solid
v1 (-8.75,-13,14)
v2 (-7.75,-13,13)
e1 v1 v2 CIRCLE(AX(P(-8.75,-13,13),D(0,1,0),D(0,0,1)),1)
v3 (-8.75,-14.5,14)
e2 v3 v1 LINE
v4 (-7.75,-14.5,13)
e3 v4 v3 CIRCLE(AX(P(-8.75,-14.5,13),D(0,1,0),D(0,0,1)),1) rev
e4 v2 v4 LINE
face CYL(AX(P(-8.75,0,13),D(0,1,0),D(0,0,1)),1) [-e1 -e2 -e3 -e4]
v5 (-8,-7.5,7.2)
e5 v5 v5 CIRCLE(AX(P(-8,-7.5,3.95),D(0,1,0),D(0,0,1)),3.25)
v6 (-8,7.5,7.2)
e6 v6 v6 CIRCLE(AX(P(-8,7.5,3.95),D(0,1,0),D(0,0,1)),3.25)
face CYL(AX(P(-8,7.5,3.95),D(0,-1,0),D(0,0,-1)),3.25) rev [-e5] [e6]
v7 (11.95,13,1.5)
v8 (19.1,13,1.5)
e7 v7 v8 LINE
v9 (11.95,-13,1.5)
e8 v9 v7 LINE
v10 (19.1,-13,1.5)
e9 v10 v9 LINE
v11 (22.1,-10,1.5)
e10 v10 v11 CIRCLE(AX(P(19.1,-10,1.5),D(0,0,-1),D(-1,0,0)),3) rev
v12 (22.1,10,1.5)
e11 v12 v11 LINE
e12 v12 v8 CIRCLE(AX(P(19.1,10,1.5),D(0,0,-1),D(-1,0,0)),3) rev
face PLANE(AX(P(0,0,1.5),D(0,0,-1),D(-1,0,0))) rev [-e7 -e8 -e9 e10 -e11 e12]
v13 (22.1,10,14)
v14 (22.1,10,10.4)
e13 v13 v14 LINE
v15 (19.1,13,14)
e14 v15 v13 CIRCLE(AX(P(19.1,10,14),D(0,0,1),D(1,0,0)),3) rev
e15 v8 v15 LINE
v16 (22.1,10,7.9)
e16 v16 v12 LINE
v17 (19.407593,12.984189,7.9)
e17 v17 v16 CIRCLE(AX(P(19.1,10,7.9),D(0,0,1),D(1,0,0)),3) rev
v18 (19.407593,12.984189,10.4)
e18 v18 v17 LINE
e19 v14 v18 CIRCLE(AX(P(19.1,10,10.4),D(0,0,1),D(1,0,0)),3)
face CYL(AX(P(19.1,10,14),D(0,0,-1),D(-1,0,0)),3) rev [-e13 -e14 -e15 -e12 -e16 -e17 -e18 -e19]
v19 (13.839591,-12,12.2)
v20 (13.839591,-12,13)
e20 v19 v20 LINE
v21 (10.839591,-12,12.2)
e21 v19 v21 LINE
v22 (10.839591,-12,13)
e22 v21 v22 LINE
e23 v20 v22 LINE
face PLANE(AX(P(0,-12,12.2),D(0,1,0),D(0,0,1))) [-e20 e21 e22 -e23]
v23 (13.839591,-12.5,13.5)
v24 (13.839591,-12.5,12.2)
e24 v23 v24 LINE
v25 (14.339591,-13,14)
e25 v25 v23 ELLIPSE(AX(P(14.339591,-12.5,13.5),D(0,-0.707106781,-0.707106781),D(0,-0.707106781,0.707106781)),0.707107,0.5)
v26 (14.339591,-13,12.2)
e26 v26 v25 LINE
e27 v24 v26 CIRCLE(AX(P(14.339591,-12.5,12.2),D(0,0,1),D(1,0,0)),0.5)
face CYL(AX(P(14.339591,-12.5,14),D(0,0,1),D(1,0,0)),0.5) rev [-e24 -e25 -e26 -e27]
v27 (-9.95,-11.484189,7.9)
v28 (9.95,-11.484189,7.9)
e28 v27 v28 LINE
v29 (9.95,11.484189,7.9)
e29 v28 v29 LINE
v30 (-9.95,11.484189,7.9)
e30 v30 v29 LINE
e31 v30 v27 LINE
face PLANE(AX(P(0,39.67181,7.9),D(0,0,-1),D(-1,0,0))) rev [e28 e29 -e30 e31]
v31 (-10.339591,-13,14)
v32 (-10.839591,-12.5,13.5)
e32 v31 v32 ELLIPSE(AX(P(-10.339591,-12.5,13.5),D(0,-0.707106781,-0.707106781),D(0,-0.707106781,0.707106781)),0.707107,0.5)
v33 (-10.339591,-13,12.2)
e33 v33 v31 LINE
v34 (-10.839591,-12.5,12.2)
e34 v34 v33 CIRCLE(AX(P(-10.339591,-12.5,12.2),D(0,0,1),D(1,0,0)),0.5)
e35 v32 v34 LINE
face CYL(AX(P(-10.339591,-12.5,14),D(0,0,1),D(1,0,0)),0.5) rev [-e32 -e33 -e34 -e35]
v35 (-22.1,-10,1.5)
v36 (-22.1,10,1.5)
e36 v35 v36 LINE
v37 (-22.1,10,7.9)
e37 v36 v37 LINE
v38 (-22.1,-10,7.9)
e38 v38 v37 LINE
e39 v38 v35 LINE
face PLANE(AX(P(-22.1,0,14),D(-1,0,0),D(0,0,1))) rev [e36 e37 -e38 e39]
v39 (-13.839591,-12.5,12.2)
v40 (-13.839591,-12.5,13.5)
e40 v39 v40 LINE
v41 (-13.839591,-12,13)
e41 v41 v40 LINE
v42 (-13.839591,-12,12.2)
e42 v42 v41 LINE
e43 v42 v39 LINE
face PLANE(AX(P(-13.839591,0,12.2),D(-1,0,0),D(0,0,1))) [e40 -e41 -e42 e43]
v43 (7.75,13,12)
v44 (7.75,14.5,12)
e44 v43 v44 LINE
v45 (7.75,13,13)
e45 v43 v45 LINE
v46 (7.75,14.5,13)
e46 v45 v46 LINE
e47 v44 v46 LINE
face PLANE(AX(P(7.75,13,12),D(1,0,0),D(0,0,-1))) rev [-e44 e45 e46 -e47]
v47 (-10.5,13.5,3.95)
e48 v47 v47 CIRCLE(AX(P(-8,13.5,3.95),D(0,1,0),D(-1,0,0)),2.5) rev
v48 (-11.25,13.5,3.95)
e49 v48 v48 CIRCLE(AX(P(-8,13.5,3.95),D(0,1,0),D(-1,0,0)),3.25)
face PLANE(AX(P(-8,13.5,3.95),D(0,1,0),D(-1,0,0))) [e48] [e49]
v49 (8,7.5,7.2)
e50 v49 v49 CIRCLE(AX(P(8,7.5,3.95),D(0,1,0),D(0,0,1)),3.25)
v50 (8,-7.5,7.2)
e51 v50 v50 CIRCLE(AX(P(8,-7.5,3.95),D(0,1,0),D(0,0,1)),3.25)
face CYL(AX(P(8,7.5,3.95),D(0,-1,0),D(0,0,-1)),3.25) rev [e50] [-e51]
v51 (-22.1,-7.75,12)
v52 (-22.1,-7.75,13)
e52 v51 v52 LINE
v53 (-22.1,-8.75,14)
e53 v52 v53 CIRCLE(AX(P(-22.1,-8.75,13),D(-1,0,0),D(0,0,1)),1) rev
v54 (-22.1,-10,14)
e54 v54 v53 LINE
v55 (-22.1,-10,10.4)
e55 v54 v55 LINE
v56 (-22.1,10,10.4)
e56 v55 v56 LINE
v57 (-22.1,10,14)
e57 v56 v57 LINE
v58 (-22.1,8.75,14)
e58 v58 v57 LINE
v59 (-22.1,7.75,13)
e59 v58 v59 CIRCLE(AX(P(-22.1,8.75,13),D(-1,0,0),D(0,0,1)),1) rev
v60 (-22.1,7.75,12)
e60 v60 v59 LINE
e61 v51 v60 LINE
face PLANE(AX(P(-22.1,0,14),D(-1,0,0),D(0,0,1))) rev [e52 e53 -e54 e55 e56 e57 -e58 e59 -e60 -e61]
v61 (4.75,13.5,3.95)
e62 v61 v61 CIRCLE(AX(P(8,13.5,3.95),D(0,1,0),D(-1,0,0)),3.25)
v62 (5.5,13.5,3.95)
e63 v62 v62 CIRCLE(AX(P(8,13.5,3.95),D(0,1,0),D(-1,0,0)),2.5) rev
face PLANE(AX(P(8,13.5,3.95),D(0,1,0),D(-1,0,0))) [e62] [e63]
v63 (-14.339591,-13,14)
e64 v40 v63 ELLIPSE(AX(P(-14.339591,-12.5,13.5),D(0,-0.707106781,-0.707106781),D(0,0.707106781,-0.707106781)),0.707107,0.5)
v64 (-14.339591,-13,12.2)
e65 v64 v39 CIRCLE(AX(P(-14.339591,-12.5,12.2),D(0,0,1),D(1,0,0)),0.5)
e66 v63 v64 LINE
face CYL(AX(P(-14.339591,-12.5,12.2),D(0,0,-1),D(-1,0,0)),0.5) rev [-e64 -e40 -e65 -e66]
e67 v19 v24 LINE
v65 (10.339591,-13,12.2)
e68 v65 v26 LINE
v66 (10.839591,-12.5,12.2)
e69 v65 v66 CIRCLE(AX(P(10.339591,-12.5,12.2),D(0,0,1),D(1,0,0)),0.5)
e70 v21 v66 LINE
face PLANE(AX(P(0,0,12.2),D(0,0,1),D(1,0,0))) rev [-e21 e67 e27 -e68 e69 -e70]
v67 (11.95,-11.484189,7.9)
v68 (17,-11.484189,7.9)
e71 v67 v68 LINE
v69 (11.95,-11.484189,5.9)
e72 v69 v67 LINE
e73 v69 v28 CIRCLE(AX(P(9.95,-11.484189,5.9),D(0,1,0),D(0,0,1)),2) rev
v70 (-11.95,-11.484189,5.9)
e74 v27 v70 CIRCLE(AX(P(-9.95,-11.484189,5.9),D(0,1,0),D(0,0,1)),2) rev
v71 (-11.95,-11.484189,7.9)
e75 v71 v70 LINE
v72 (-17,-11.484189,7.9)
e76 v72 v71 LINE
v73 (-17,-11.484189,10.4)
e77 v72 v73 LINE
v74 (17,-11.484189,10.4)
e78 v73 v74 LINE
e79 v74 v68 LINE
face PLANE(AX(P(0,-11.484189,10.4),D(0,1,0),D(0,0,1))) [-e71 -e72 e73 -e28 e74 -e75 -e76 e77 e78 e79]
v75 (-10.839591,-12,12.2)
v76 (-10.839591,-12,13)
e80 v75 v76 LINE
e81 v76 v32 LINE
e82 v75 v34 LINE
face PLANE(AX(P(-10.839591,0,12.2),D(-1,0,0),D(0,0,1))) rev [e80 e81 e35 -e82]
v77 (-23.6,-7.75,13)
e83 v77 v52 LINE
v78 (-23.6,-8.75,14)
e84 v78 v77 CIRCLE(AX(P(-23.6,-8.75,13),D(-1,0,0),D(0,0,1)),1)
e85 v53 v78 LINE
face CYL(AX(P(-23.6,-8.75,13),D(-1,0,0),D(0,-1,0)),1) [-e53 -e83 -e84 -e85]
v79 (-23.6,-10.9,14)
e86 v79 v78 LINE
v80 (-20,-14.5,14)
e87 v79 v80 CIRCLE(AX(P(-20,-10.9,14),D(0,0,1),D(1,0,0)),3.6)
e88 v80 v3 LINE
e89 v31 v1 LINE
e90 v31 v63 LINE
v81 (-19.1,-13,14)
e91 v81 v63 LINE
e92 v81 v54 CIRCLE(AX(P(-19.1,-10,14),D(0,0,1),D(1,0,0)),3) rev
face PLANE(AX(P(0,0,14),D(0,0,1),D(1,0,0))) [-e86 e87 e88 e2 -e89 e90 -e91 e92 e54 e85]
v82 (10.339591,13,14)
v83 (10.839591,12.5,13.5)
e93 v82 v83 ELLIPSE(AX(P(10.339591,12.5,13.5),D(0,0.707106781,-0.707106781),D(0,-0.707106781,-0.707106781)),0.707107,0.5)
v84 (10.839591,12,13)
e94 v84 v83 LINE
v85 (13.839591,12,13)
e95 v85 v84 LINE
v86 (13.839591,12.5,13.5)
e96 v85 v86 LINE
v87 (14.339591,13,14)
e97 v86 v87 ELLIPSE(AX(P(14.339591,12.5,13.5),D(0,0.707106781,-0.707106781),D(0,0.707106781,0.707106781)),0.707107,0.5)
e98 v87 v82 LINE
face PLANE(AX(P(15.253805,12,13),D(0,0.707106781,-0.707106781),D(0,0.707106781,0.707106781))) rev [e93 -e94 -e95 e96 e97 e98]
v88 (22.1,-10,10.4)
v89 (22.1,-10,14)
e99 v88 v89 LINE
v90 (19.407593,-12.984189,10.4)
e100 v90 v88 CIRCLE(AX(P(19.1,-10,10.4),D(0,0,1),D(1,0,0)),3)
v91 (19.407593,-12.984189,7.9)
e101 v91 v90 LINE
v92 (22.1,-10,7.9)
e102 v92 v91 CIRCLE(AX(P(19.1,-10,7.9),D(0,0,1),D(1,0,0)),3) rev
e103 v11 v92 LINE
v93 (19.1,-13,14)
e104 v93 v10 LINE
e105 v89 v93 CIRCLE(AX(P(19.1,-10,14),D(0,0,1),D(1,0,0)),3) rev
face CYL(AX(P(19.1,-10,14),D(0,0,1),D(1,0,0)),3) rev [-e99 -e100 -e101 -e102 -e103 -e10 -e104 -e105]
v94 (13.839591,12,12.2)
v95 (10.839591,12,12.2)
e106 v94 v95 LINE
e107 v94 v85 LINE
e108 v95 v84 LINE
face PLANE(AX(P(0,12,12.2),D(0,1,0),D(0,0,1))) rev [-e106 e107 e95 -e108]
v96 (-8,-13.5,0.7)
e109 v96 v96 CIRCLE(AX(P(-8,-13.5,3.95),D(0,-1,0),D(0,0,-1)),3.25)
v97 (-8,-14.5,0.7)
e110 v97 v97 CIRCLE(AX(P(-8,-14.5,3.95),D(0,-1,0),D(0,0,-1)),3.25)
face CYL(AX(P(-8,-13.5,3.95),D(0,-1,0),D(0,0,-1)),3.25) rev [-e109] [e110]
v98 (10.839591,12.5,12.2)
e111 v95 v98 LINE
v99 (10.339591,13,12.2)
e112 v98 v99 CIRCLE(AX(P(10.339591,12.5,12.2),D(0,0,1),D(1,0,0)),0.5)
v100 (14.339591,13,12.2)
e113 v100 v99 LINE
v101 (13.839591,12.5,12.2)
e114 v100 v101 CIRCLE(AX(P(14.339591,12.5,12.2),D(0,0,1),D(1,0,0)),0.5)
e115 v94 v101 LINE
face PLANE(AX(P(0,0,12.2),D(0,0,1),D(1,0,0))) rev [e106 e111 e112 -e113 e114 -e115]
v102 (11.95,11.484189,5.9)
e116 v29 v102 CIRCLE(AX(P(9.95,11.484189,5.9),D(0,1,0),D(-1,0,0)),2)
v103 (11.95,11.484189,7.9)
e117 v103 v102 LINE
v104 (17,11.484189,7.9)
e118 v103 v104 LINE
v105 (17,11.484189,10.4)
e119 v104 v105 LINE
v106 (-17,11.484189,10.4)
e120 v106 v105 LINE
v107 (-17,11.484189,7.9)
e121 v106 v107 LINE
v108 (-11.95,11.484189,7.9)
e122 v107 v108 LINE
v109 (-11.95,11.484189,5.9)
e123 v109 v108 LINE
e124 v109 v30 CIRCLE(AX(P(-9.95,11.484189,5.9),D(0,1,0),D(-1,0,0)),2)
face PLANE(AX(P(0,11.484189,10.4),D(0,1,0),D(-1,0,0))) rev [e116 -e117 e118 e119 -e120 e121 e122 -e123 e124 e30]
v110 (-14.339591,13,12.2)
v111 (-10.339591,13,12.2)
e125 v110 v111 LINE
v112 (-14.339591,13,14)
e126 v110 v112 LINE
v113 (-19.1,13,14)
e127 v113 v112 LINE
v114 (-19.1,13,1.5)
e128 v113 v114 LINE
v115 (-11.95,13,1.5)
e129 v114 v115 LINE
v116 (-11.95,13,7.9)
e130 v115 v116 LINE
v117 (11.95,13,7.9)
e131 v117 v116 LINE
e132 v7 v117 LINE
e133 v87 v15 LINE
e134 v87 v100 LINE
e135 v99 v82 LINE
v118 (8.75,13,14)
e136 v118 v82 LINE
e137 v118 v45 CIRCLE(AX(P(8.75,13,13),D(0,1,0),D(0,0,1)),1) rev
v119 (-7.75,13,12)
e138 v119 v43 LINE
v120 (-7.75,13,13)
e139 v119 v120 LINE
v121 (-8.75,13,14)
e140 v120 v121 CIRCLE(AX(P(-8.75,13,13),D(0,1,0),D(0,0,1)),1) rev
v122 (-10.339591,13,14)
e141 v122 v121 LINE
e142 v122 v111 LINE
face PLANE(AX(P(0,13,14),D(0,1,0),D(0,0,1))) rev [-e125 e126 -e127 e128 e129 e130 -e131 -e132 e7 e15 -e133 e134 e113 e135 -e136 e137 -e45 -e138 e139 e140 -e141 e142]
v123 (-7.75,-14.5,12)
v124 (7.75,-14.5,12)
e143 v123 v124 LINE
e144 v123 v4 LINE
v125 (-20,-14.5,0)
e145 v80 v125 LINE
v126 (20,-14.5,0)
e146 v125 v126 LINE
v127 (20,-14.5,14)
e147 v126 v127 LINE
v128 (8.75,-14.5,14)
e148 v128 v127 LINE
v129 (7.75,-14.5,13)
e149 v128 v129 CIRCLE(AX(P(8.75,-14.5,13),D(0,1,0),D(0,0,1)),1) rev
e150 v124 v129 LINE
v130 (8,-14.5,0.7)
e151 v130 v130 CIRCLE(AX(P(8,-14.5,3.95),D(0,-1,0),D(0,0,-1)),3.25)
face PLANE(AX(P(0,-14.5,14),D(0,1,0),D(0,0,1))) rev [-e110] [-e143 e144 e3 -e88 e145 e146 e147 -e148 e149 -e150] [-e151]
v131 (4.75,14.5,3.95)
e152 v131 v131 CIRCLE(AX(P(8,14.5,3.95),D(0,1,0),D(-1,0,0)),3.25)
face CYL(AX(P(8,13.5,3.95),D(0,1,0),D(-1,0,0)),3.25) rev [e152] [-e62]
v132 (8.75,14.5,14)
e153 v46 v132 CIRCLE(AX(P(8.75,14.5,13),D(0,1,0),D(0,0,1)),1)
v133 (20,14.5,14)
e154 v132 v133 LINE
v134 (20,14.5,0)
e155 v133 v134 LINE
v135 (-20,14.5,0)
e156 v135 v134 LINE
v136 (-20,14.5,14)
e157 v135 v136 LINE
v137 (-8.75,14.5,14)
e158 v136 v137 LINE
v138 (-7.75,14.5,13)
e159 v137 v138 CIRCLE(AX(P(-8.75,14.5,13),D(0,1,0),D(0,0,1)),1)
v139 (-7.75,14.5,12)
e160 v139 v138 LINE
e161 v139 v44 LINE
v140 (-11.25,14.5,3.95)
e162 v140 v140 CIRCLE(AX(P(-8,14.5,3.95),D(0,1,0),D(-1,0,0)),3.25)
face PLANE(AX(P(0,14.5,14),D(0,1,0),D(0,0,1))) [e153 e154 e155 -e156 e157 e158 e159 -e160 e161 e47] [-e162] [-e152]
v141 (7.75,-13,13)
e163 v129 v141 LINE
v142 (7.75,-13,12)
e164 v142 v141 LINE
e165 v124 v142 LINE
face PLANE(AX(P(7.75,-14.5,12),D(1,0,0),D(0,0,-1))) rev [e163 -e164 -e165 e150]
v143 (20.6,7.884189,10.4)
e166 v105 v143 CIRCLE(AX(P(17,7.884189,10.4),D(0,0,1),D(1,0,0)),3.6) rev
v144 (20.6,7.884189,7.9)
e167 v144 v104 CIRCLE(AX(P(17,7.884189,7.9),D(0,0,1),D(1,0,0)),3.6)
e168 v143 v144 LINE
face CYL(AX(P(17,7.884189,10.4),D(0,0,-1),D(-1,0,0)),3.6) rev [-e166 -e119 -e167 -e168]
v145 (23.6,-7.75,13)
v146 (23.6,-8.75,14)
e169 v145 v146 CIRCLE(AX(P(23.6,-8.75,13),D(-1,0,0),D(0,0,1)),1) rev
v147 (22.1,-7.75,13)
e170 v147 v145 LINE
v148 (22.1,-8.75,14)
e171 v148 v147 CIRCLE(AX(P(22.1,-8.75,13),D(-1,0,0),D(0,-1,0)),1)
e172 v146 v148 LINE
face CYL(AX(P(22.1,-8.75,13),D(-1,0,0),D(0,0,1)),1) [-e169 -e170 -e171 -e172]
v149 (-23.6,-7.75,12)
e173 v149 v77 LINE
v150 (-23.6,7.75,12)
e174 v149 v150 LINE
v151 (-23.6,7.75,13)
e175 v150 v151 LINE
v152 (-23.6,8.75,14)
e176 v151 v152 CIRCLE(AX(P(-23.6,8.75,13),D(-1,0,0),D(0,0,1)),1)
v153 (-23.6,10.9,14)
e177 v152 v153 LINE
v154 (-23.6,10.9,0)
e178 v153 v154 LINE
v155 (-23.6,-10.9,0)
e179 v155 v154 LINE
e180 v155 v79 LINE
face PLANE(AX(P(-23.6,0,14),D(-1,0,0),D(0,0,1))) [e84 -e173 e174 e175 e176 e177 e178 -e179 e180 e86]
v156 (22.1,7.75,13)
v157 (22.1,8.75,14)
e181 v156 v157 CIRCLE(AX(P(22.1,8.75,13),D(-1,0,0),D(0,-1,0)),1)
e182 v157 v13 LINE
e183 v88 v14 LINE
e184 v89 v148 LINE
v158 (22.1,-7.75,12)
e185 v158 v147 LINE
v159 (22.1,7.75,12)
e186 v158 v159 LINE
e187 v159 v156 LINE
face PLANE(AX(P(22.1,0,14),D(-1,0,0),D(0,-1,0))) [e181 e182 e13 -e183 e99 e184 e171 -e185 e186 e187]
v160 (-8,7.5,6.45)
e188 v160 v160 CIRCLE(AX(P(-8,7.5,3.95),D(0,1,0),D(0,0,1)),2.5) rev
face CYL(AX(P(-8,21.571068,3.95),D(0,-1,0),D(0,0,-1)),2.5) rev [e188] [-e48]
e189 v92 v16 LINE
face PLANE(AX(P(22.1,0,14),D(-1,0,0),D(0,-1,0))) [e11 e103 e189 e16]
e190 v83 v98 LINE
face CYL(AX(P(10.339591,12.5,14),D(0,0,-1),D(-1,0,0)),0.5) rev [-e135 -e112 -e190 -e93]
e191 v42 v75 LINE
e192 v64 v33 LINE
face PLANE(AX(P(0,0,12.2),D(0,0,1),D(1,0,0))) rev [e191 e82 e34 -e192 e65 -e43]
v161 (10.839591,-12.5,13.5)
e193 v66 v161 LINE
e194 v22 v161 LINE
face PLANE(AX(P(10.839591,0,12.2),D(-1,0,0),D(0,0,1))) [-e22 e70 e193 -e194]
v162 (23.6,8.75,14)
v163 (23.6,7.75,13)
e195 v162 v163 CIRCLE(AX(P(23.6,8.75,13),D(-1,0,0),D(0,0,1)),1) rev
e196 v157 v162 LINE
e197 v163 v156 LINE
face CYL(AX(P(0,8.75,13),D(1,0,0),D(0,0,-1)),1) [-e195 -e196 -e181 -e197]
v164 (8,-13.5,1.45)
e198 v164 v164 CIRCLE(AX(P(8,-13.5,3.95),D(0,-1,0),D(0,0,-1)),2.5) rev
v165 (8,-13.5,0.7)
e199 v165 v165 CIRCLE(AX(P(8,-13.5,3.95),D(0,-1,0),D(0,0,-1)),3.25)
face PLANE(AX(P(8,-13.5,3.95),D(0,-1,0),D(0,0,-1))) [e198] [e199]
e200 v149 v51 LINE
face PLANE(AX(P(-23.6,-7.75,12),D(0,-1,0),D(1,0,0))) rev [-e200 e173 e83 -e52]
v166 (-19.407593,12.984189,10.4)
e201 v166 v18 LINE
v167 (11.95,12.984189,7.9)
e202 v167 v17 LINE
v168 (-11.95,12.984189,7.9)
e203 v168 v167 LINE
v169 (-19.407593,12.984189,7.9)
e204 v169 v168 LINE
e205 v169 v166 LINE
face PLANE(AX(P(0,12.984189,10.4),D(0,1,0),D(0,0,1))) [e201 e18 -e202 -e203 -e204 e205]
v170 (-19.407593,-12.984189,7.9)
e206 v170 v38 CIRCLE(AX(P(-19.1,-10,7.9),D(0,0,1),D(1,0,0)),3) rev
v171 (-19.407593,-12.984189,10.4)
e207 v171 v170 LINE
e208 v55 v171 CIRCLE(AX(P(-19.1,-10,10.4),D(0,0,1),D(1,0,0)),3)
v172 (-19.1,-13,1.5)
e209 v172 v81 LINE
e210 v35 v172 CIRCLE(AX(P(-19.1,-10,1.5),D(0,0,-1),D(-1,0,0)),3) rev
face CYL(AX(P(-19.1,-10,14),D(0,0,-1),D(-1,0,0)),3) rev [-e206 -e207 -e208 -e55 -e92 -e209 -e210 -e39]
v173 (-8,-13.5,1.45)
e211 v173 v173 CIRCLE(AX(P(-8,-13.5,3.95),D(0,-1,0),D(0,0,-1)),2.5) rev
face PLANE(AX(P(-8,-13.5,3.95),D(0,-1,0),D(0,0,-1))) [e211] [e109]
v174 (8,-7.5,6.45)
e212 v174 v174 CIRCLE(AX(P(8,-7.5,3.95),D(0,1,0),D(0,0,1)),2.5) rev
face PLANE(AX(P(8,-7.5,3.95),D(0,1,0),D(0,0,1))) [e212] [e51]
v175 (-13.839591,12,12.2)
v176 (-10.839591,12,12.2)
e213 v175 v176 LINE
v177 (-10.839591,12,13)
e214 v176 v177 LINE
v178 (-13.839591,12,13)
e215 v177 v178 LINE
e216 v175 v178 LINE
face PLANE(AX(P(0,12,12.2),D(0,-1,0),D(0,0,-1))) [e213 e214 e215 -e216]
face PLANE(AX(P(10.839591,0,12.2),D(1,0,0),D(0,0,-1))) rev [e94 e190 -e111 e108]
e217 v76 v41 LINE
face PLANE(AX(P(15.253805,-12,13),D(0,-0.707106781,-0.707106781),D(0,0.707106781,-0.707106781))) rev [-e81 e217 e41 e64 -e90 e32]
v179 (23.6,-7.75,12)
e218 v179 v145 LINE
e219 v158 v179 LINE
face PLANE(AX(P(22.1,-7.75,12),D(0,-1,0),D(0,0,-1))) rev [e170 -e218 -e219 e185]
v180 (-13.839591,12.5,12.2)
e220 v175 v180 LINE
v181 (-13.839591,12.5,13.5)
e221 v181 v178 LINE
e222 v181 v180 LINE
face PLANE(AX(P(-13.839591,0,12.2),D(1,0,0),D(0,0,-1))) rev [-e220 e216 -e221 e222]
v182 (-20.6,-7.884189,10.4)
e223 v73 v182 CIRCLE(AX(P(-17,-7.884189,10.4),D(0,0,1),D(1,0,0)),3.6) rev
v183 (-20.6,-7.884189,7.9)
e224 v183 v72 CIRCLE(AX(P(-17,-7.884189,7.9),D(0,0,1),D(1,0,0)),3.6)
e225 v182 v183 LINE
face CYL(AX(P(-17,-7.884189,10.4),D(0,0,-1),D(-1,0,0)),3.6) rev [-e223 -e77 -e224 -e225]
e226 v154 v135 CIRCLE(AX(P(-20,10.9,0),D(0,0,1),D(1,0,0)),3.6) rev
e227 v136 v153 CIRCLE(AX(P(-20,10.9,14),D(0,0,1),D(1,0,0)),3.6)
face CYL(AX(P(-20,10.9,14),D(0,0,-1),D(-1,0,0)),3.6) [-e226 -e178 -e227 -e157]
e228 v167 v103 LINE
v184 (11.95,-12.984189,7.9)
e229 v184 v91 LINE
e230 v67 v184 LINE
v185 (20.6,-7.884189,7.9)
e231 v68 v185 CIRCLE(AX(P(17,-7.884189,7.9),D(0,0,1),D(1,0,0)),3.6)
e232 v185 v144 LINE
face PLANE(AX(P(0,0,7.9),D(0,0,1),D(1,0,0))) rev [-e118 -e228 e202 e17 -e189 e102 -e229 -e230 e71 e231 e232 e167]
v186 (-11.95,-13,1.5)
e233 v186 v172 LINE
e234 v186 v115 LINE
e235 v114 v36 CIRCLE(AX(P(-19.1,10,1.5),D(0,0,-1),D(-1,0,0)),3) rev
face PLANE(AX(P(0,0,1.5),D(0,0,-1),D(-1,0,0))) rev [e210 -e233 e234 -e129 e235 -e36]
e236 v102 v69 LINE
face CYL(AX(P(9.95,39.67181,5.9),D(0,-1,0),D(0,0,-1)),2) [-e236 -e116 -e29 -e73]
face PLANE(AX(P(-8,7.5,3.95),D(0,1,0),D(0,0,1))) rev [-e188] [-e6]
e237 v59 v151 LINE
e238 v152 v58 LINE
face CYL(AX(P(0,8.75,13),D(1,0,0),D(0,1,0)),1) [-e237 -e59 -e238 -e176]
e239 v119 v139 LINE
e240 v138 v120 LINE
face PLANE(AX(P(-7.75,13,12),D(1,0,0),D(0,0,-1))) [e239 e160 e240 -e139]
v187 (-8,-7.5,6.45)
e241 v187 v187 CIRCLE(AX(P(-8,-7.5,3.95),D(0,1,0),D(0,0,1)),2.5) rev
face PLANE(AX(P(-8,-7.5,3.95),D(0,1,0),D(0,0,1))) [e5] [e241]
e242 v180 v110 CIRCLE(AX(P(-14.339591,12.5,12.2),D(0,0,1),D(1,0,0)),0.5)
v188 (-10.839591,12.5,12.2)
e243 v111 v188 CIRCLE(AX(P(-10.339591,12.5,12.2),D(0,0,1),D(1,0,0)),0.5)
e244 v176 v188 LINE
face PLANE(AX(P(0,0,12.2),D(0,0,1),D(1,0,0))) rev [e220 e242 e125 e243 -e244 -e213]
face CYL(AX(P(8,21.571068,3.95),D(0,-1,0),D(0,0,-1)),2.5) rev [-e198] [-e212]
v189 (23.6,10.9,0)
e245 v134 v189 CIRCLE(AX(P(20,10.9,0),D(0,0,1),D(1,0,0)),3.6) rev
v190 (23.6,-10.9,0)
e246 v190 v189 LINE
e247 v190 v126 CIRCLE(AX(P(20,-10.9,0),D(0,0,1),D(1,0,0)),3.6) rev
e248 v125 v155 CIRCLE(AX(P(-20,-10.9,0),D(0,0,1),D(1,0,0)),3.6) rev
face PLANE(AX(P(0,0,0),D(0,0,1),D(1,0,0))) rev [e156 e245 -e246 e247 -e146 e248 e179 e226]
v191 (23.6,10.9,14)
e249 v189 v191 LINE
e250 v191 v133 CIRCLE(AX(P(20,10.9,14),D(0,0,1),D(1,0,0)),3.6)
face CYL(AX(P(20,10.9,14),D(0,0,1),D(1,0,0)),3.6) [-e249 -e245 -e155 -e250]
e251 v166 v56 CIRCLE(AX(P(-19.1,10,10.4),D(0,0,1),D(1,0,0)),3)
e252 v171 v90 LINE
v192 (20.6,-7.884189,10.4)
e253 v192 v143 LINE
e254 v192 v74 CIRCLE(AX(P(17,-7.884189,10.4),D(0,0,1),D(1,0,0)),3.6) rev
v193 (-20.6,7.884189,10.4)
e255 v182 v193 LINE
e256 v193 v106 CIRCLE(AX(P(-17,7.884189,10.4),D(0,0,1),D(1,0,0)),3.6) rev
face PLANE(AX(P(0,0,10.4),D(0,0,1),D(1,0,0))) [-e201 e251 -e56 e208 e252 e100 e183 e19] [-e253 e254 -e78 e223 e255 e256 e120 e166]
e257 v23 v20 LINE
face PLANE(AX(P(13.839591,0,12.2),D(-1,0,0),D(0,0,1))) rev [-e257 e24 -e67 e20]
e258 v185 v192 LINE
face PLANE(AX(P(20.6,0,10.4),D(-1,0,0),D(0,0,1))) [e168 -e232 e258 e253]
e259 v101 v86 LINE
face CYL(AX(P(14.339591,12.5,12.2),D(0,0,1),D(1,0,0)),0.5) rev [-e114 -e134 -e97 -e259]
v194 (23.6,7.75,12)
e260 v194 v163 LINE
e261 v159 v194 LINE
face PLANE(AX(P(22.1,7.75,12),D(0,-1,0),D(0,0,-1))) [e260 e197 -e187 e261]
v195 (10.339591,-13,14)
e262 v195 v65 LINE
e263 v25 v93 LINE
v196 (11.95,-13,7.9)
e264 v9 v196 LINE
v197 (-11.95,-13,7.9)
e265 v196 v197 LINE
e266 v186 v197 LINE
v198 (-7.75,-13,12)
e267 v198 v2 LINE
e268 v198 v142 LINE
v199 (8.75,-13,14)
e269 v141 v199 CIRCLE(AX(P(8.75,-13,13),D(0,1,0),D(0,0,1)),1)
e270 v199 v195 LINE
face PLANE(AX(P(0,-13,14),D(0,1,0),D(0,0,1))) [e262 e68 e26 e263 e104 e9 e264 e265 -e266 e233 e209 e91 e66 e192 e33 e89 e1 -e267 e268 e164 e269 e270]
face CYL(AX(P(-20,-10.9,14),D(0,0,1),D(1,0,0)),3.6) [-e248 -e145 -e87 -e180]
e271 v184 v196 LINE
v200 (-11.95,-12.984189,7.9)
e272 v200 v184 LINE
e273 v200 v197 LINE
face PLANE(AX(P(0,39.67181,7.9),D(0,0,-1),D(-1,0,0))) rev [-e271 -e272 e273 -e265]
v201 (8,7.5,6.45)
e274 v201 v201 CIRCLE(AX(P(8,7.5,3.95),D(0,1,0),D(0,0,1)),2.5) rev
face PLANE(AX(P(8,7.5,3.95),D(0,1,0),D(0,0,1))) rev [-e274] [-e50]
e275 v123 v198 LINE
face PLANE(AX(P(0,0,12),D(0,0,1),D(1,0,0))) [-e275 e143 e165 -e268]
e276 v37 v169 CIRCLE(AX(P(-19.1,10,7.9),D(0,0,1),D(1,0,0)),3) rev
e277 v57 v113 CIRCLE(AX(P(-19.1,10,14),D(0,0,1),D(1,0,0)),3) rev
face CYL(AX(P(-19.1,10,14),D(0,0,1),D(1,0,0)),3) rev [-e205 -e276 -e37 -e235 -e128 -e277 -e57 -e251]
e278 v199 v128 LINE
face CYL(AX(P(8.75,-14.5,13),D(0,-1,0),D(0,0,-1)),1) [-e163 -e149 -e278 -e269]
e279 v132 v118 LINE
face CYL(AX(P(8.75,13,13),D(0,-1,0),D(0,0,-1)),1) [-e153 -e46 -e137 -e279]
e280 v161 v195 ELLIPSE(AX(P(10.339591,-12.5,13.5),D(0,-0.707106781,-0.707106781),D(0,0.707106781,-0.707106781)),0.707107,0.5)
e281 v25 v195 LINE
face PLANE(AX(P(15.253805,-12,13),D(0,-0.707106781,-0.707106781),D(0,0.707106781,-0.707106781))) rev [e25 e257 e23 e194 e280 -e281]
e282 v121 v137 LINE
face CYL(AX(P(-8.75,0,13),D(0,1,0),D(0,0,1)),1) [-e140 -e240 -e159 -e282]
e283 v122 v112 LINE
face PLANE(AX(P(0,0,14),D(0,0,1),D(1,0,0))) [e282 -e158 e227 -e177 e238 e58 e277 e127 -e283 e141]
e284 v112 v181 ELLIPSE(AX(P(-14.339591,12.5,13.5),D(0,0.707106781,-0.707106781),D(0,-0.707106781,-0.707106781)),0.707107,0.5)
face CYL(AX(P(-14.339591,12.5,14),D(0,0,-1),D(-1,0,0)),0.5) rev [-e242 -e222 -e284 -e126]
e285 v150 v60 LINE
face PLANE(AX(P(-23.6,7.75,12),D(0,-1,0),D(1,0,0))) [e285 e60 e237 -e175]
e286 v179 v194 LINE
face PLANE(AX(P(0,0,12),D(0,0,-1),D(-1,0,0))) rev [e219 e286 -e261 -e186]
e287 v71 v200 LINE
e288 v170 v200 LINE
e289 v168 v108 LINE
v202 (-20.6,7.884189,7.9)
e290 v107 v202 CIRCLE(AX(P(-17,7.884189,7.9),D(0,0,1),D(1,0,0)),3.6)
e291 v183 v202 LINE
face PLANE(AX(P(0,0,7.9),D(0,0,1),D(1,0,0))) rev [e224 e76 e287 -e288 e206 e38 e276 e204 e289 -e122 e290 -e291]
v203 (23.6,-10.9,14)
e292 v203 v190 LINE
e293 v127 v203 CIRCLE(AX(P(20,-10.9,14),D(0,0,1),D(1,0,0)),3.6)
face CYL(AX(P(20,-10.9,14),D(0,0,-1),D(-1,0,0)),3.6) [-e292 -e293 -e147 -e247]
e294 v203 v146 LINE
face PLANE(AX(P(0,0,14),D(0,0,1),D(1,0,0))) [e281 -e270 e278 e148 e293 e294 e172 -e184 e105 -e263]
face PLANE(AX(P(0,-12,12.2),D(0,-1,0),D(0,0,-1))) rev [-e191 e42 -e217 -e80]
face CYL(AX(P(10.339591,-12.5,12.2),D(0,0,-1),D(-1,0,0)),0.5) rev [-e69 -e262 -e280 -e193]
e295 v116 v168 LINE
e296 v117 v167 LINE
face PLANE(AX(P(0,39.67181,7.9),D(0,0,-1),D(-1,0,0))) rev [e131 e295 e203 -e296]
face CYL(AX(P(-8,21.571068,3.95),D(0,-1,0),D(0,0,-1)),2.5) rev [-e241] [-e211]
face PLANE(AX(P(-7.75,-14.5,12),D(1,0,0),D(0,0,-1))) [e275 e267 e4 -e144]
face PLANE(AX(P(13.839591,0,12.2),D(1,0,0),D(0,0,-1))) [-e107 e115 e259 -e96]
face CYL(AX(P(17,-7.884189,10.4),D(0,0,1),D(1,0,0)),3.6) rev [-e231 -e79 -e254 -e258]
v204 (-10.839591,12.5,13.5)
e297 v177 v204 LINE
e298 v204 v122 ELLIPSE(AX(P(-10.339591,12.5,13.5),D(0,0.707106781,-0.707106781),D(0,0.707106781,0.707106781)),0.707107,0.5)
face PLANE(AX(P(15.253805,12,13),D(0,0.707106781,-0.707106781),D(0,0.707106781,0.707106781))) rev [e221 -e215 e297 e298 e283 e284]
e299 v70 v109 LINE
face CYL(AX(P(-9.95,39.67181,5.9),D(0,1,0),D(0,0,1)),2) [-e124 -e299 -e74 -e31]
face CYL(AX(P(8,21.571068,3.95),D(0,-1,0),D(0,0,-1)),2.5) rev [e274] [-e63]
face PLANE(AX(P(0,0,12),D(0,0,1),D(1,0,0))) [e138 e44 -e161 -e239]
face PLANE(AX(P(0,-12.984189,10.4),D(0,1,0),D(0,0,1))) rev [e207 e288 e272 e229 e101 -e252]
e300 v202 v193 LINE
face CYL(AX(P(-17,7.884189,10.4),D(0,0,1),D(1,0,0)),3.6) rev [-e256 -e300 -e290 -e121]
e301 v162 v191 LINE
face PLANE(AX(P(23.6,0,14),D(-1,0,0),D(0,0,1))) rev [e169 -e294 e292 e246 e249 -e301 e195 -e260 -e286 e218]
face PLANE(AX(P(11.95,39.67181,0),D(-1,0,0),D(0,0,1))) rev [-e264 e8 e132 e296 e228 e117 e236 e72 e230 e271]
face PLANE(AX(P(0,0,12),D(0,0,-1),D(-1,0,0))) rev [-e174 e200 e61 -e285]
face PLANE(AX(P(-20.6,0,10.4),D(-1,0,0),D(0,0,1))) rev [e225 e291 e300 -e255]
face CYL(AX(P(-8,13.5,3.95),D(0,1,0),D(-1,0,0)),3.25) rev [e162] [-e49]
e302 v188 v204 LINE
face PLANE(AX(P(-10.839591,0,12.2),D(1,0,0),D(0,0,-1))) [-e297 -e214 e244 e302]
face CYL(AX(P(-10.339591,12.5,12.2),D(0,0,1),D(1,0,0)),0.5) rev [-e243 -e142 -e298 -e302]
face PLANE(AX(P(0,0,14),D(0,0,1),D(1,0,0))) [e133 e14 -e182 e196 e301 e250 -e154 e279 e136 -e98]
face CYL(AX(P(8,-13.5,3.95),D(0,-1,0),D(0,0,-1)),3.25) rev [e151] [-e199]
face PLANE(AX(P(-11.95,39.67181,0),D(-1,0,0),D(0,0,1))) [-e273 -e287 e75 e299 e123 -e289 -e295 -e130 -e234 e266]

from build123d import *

# Parameters (mm, degrees)
SKETCH1_W               = 47.2
SKETCH1_H               = 29
SKETCH1_W_2             = 44.2
SKETCH1_H_2             = 26
BOSS_EXTRUDE2_DEPTH     = 14
SKETCH2_W               = 44.2
SKETCH2_H               = 26
BOSS_EXTRUDE3_DEPTH     = 1.5
SKETCH3_W               = 23.9
SKETCH3_H               = 7.9
SKETCH3_R               = 2.45
BOSS_EXTRUDE4_DEPTH     = 29
SKETCH4_R               = 2.5
CUT_EXTRUDE1_DEPTH      = 29
SKETCH5_R               = 3.25
CUT_EXTRUDE2_DEPTH      = 1
CUT_EXTRUDE3_START      = -1
SKETCH6_R               = 3.25
CUT_EXTRUDE3_DEPTH      = 1
CUT_EXTRUDE4_DEPTH      = 7.5
CUT_EXTRUDE4_DEPTH_BACK = 7.5
SKETCH8_R               = 3.25
SKETCH9_W               = 44.2
SKETCH9_H               = 25.968378764
SKETCH9_W_2             = 41.2
SKETCH9_H_2             = 22.968378764
BOSS_EXTRUDE5_DEPTH     = 2.5
SKETCH10_W              = 15.5
SKETCH10_H              = 1.5
SKETCH10_W_2            = 1.5
SKETCH10_H_2            = 15.5
CUT_EXTRUDE6_DEPTH      = 2
FILLET1_R               = 2
BOSS_EXTRUDE6_DEPTH     = 1.8
CUT_EXTRUDE7_REACH      = 44.52
FILLET2_R               = 0.5
FILLET3_R               = 3.6
FILLET4_R               = 1
FILLET5_R               = 3


with BuildPart() as part:
    # Sketch1 → Boss-Extrude2 (new body)
    with BuildSketch(Plane.XY):
        Rectangle(SKETCH1_W, SKETCH1_H)
        Rectangle(SKETCH1_W_2, SKETCH1_H_2, mode=Mode.SUBTRACT)
    extrude(amount=BOSS_EXTRUDE2_DEPTH)

    # Sketch2 → Boss-Extrude3 (add)
    with BuildSketch(Plane(origin=(0, 0, 0), x_dir=(-1, 0, 0), z_dir=(0, 0, -1))):
        Rectangle(SKETCH2_W, SKETCH2_H)
    extrude(amount=-BOSS_EXTRUDE3_DEPTH)

    # Sketch3 → Boss-Extrude4 (add)
    with BuildSketch(Plane.XZ.offset(14.5)):
        with Locations((0, 3.95)):
            Rectangle(SKETCH3_W, SKETCH3_H)
        with Locations(Location((-8, 3.95, 0), (0, 0, 90))):
            Circle(SKETCH3_R, mode=Mode.SUBTRACT)
        with Locations(Location((8, 3.95, 0), (0, 0, 90))):
            Circle(SKETCH3_R, mode=Mode.SUBTRACT)
    extrude(amount=-BOSS_EXTRUDE4_DEPTH)

    # Sketch4 → Cut-Extrude1 (cut)
    with BuildSketch(Plane.XZ.offset(14.5)):
        with Locations(Location((-8, 3.95, 0), (0, 0, 270))):
            Circle(SKETCH4_R)
        with Locations(Location((8, 3.95, 0), (0, 0, 270))):
            Circle(SKETCH4_R)
    extrude(amount=-CUT_EXTRUDE1_DEPTH, mode=Mode.SUBTRACT)

    # Sketch5 → Cut-Extrude2 (cut)
    with BuildSketch(Plane.XZ.offset(14.5)):
        with Locations(Location((-8, 3.95, 0), (0, 0, 270))):
            Circle(SKETCH5_R)
        with Locations(Location((8, 3.95, 0), (0, 0, 270))):
            Circle(SKETCH5_R)
    extrude(amount=-CUT_EXTRUDE2_DEPTH, mode=Mode.SUBTRACT)

    # Sketch6 → Cut-Extrude3 (cut)
    with BuildSketch(Plane(origin=(0, 14.5, 0), x_dir=(1, 0, 0), z_dir=(0, 1, 0)).offset(CUT_EXTRUDE3_START)):
        with Locations(Location((-8, -3.95, 0), (0, 0, 90))):
            Circle(SKETCH6_R)
        with Locations(Location((8, -3.95, 0), (0, 0, 90))):
            Circle(SKETCH6_R)
    extrude(amount=CUT_EXTRUDE3_DEPTH, mode=Mode.SUBTRACT)

    # Sketch8 → Cut-Extrude4 (cut, two sides: drawn at the far end of the back side and taken through both)
    with BuildSketch(Plane(origin=(0, 0, 0), x_dir=(1, 0, 0), z_dir=(0, 1, 0)).offset(-CUT_EXTRUDE4_DEPTH_BACK)):
        with Locations(Location((-8, -3.95, 0), (0, 0, 90))):
            Circle(SKETCH8_R)
        with Locations(Location((8, -3.95, 0), (0, 0, 90))):
            Circle(SKETCH8_R)
    extrude(amount=CUT_EXTRUDE4_DEPTH + CUT_EXTRUDE4_DEPTH_BACK, mode=Mode.SUBTRACT)

    # Sketch9 → Boss-Extrude5 (add)
    with BuildSketch(Plane.XY.offset(7.9)):
        Rectangle(SKETCH9_W, SKETCH9_H)
        Rectangle(SKETCH9_W_2, SKETCH9_H_2, mode=Mode.SUBTRACT)
    extrude(amount=BOSS_EXTRUDE5_DEPTH)

    # Sketch10 → Cut-Extrude6 (cut)
    with BuildSketch(Plane.XY.offset(14)):
        with Locations((0, 13.75)):
            Rectangle(SKETCH10_W, SKETCH10_H)
        with Locations((22.85, 0)):
            Rectangle(SKETCH10_W_2, SKETCH10_H_2)
        with Locations((0, -13.75)):
            Rectangle(SKETCH10_W, SKETCH10_H)
        with Locations((-22.85, 0)):
            Rectangle(SKETCH10_W_2, SKETCH10_H_2)
    extrude(amount=-CUT_EXTRUDE6_DEPTH, mode=Mode.SUBTRACT)

    # Fillet1
    fillet1_edges = [part.edges().sort_by_distance(p)[0] for p in [
        (11.95, 0, 7.9),
        (-11.95, 0, 7.9),
    ]]
    fillet(fillet1_edges, radius=FILLET1_R)

    # Sketch12 → Boss-Extrude6 (add)
    with BuildSketch(Plane.XY.offset(14)):
        Polygon((-10.839591229, 12), (-10.839591229, 13), (-12.339591229, 13), (-13.839591229, 13), (-13.839591229, 12), align=None)
        Polygon((-10.839591229, -13), (-10.839591229, -12), (-13.839591229, -12), (-13.839591229, -13), (-12.339591229, -13), align=None)
        Polygon((10.839591229, -12), (10.839591229, -13), (12.339591229, -13), (13.839591229, -13), (13.839591229, -12), align=None)
        Polygon((10.839591229, 13), (10.839591229, 12), (13.839591229, 12), (13.839591229, 13), (12.339591229, 13), align=None)
    extrude(amount=-BOSS_EXTRUDE6_DEPTH)

    # Cut-Extrude7: up to this face of the body (flat: up to its plane)
    cut_extrude7_end = Plane(part.part.faces().sort_by_distance((13.839591229, -12.5, 13.1))[0])
    # Sketch13 → Cut-Extrude7 (cut, up to the picked face)
    with BuildSketch(Plane.ZY.offset(13.839591229), mode=Mode.PRIVATE) as cut_extrude7_sk1:
        Polygon((14, 13), (14, 12), (13, 12), align=None)
    cut_extrude7_tool1 = split(extrude(cut_extrude7_sk1.sketch, amount=-CUT_EXTRUDE7_REACH, mode=Mode.PRIVATE), bisect_by=cut_extrude7_end, keep=Keep.BOTH, mode=Mode.PRIVATE)
    # Sketch13 → Cut-Extrude7 (cut, up to the picked face)
    with BuildSketch(Plane.ZY.offset(13.839591229), mode=Mode.PRIVATE) as cut_extrude7_sk2:
        Polygon((14, -13), (14, -12), (13, -12), align=None)
    cut_extrude7_tool2 = split(extrude(cut_extrude7_sk2.sketch, amount=-CUT_EXTRUDE7_REACH, mode=Mode.PRIVATE), bisect_by=cut_extrude7_end, keep=Keep.BOTH, mode=Mode.PRIVATE)
    add(cut_extrude7_tool1.solids().sort_by(Axis((-13.839591, 12.333333, 13.666667), (1, 0, 0)))[0], mode=Mode.SUBTRACT)
    add(cut_extrude7_tool2.solids().sort_by(Axis((-13.839591, -12.333333, 13.666667), (1, 0, 0)))[0], mode=Mode.SUBTRACT)

    # Fillet2
    fillet2_edges = [part.edges().sort_by_distance(p)[0] for p in [
        (-13.839591229, 13, 13.1),
        (-10.839591229, 13, 13.1),
        (10.839591229, 13, 13.1),
        (13.839591229, 13, 13.1),
        (13.839591229, -13, 13.1),
        (10.839591229, -13, 13.1),
        (-10.839591229, -13, 13.1),
        (-13.839591229, -13, 13.1),
    ]]
    fillet(fillet2_edges, radius=FILLET2_R)

    # Fillet3
    fillet3_edges = [part.edges().sort_by_distance(p)[0] for p in [
        (20.6, -11.484189382, 9.15),
        (-20.6, -11.484189382, 9.15),
        (-20.6, 11.484189382, 9.15),
        (20.6, 11.484189382, 9.15),
        (-23.6, 14.5, 7),
        (23.6, 14.5, 7),
        (23.6, -14.5, 7),
        (-23.6, -14.5, 7),
    ]]
    fillet(fillet3_edges, radius=FILLET3_R)

    # Fillet4
    fillet4_edges = [part.edges().sort_by_distance(p)[0] for p in [
        (-22.85, 7.75, 14),
        (-22.85, -7.75, 14),
        (-7.75, 13.75, 14),
        (7.75, 13.75, 14),
        (22.85, 7.75, 14),
        (22.85, -7.75, 14),
        (-7.75, -13.75, 14),
        (7.75, -13.75, 14),
    ]]
    fillet(fillet4_edges, radius=FILLET4_R)

    # Fillet5
    # the kernel refuses this fillet: 3 mm, written as the material it adds along each edge
    with BuildSketch(Plane(origin=(22.1, 13, 1.5), x_dir=(0, -1, 0), z_dir=(0, 0, 1)), Plane(origin=(22.1, -13, 1.5), x_dir=(-1, 0, 0), z_dir=(0, 0, 1))) as fillet5_piece_1:
        with BuildLine():
            CenterArc((FILLET5_R, -FILLET5_R), FILLET5_R, 90, 90)
            Line((0, -FILLET5_R), (0, 0))
            Line((0, 0), (FILLET5_R, 0))
        make_face()
    extrude(amount=12.5)
    with BuildSketch(Plane(origin=(-22.1, 13, 1.5), x_dir=(0, -1, 0), z_dir=(0, 0, 1)), Plane(origin=(-22.1, -13, 1.5), x_dir=(1, 0, 0), z_dir=(0, 0, 1))) as fillet5_piece_2:
        with BuildLine():
            CenterArc((FILLET5_R, FILLET5_R), FILLET5_R, 180, 90)
            Line((0, FILLET5_R), (0, 0))
            Line((0, 0), (FILLET5_R, 0))
        make_face()
    extrude(amount=12.5)


solid = part.part
